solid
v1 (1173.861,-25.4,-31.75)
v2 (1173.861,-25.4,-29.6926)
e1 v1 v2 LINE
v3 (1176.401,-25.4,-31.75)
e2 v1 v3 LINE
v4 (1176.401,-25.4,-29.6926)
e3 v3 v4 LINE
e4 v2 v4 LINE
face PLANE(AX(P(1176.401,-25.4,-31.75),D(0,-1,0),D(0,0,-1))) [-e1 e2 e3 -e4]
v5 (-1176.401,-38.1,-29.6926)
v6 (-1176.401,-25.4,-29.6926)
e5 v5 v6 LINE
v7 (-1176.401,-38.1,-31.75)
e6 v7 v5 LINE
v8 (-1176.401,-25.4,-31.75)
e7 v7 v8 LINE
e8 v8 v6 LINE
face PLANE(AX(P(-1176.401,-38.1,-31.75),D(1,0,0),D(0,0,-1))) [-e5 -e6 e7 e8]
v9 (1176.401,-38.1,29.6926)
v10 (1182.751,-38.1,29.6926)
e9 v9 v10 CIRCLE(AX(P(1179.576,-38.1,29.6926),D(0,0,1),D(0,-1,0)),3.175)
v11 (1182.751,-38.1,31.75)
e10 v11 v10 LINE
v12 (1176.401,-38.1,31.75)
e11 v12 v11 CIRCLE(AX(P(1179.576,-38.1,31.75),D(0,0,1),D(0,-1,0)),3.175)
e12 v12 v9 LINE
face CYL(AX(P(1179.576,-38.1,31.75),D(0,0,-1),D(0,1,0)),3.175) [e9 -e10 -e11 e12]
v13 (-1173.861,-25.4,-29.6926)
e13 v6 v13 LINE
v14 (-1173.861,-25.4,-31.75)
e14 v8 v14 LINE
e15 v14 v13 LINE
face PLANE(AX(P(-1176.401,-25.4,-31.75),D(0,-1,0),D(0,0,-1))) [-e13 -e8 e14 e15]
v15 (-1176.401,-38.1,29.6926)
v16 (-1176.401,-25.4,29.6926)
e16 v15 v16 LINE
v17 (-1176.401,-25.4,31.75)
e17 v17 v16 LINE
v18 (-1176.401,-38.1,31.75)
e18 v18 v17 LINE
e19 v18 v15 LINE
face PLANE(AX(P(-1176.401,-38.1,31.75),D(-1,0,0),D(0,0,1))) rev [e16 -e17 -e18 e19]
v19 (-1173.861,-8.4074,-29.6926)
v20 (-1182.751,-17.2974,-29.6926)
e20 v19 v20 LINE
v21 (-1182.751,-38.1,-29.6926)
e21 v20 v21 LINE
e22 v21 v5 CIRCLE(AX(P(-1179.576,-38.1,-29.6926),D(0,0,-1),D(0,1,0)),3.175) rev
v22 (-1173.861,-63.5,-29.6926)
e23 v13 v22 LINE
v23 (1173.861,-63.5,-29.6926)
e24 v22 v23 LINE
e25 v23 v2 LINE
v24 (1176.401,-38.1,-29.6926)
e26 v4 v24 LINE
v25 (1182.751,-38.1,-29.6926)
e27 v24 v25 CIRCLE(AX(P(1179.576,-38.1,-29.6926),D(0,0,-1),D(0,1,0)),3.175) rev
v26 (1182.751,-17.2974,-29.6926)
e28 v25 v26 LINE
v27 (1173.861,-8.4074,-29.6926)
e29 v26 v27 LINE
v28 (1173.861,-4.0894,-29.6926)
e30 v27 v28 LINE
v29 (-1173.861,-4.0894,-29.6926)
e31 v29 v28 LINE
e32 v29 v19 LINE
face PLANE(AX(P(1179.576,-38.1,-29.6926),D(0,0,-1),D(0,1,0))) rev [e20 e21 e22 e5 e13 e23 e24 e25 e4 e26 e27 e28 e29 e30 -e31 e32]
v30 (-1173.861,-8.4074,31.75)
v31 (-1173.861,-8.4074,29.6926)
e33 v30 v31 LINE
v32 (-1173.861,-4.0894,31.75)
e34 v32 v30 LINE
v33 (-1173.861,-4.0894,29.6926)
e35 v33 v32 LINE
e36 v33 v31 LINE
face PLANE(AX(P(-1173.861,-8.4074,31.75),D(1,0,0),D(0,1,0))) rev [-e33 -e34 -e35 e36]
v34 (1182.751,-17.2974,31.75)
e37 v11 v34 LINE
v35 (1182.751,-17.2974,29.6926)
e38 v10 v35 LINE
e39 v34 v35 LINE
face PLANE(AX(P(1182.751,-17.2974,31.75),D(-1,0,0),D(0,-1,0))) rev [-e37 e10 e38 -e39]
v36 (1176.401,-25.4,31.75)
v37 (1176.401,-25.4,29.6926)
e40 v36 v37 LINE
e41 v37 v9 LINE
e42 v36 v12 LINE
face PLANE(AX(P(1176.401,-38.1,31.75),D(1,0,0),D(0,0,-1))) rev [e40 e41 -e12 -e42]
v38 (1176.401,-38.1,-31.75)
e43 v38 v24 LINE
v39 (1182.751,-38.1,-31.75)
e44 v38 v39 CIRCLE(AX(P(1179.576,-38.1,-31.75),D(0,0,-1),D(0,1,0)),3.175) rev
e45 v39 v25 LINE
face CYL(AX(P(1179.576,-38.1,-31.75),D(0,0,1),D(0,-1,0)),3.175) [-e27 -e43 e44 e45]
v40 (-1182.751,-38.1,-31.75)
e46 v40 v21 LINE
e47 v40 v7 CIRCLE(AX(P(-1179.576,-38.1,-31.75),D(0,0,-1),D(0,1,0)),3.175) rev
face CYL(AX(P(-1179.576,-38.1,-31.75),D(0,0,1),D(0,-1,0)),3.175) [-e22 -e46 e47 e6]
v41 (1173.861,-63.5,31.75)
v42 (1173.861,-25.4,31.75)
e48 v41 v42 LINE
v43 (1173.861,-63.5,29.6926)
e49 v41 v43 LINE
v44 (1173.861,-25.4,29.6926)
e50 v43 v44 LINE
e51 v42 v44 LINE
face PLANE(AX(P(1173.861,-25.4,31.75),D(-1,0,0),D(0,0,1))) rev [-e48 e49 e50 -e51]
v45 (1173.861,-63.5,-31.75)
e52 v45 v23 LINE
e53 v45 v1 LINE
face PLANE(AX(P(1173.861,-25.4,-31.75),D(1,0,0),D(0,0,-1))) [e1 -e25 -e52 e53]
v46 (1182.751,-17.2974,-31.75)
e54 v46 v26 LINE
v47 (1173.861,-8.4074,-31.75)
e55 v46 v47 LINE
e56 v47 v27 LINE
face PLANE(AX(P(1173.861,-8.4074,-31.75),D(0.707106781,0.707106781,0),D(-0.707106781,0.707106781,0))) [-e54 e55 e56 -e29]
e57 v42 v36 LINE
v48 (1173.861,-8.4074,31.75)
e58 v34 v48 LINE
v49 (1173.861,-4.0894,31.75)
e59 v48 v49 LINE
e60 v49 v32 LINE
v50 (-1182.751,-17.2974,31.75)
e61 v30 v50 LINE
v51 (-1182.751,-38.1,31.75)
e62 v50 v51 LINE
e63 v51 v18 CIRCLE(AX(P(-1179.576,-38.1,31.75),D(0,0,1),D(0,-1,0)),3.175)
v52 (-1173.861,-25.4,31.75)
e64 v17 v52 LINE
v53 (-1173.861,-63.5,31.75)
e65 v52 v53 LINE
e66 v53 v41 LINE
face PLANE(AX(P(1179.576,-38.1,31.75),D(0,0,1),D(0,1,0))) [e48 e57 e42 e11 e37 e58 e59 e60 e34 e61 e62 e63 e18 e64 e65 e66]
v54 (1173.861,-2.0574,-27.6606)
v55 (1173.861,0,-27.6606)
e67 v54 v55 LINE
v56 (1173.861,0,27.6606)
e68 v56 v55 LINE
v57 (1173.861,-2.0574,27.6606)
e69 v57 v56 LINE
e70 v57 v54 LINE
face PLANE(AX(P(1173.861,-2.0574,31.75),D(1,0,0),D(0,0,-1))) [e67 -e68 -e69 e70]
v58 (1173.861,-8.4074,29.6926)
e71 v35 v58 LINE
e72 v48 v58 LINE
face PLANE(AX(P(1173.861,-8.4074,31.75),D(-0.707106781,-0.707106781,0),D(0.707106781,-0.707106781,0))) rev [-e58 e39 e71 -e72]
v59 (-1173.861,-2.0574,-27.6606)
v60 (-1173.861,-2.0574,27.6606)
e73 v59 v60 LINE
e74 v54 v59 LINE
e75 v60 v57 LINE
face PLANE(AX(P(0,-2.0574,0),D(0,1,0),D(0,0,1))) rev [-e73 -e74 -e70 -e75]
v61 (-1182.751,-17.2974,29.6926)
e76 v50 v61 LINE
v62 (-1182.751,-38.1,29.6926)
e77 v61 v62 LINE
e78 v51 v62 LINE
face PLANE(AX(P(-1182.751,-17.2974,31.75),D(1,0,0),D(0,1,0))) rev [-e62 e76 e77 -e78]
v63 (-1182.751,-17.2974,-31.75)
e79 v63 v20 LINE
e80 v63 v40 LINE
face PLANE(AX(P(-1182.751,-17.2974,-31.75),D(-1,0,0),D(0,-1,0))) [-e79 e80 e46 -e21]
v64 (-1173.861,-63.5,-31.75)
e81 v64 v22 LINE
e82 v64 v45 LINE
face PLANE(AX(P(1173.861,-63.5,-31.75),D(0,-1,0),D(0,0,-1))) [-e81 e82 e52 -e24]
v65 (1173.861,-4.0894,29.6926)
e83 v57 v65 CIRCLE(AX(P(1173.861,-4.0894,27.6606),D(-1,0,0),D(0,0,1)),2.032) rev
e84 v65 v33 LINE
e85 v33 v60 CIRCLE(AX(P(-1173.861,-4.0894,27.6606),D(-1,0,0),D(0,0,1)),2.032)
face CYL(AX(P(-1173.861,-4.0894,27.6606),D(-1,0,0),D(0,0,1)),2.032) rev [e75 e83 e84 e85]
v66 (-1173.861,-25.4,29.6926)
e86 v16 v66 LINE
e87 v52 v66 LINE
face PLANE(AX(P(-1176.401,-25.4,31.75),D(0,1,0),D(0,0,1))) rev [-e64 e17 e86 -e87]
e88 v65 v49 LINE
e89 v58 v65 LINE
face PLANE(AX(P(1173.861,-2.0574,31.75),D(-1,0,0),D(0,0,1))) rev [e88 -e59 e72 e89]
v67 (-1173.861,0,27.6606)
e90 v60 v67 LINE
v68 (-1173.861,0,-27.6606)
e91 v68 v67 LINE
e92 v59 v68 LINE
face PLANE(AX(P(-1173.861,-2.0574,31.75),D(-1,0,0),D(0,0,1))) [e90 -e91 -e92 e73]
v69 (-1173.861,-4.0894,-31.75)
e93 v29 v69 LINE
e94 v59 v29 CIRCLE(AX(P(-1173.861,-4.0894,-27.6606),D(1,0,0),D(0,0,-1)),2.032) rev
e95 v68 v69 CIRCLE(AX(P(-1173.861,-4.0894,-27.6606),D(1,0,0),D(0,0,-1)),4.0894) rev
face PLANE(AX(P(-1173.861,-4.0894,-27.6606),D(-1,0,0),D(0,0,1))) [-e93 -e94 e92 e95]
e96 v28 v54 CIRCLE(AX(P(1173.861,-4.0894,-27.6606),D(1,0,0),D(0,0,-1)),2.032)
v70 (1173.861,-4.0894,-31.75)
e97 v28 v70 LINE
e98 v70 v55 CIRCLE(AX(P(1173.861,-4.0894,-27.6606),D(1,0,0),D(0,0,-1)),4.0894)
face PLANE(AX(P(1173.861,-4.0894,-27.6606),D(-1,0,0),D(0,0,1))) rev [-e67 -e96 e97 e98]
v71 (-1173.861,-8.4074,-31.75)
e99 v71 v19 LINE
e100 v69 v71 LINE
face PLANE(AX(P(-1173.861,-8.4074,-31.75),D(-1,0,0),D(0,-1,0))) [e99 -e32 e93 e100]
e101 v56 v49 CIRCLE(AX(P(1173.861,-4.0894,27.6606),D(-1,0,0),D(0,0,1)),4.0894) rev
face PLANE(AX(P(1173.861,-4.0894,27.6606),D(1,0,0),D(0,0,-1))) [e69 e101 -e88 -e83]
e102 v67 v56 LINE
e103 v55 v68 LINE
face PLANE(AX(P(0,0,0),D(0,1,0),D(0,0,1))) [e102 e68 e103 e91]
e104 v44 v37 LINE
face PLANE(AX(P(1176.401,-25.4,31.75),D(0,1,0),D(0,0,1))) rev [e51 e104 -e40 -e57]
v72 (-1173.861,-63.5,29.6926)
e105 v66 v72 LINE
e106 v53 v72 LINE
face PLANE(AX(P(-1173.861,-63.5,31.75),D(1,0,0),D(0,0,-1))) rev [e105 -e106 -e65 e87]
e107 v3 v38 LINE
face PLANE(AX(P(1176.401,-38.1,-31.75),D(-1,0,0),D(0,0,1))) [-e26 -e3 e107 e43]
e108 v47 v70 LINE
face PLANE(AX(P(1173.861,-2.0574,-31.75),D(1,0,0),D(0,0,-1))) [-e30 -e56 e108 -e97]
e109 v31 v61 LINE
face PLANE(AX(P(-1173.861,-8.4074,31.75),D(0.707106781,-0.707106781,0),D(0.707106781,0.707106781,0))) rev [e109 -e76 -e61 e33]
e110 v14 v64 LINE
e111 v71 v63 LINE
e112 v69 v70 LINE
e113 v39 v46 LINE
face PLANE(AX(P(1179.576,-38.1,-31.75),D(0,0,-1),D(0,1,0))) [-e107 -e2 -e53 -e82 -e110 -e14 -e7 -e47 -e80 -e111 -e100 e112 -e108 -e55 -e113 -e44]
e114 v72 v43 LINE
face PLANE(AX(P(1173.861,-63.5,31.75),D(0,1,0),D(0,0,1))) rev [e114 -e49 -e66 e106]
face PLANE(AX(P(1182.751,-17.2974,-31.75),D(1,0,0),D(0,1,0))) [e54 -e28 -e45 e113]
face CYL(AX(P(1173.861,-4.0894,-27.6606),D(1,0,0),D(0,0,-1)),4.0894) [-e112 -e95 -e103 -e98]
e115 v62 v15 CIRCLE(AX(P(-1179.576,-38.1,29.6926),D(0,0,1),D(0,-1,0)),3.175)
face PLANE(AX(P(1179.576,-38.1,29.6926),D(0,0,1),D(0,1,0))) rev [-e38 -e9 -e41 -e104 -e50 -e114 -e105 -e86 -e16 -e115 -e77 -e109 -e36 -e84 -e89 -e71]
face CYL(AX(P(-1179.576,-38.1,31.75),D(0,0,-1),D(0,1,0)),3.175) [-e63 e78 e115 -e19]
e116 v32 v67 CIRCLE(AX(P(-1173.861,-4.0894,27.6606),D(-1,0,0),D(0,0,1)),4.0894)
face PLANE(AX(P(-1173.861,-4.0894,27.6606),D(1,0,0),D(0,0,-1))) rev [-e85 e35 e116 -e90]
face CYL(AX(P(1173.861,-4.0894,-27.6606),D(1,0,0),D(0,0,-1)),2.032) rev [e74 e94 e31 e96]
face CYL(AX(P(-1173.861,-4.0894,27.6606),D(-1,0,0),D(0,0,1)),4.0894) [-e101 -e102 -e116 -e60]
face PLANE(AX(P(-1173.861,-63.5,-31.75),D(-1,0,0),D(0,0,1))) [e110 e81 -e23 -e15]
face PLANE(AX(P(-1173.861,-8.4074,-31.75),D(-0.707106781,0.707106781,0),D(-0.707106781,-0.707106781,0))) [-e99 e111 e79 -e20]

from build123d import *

# Parameters (mm, degrees)
SKETCH2_W                    = 2347.722
SKETCH2_H                    = 63.5
BASE_FLANGE1_DEPTH           = 2.0574
EDGE_FLANGE1_STRIP_W         = 12.2936
EDGE_FLANGE1_STRIP_H         = 2.0574
EDGE_FLANGE1_STRIP_CUT_DEPTH = 2347.722
EDGE_FLANGE1_DEPTH           = 2347.722
EDGE_FLANGE1_FLAT_DEPTH      = 2.0574


# Sheet-metal steps are written as plain solids
with BuildPart() as part:
    # Sketch2 → Base-Flange1 (new body)
    with BuildSketch(Plane(origin=(0, 0, 0), x_dir=(1, 0, 0), z_dir=(0, 1, 0))):
        Rectangle(SKETCH2_W, SKETCH2_H)
    extrude(amount=-BASE_FLANGE1_DEPTH)

    # Edge-Flange1 strip (across the edge) → Edge-Flange1 strip cut (cut)
    with BuildSketch(Plane(origin=(-1173.861, -2.0574, -31.75), x_dir=(0, 0, 1), z_dir=(1, 0, 0))):
        with Locations((-2.0574, -1.0287)):
            Rectangle(EDGE_FLANGE1_STRIP_W, EDGE_FLANGE1_STRIP_H)
    edge_flange1_strip_cut = extrude(amount=EDGE_FLANGE1_STRIP_CUT_DEPTH, mode=Mode.SUBTRACT)

    # Edge-Flange1 bend section (across the edge) → Edge-Flange1 (add)
    with BuildSketch(Plane(origin=(-1173.861, -2.0574, -31.75), x_dir=(0, 0, 1), z_dir=(1, 0, 0))):
        with BuildLine():
            Line((0, 2.032), (2.0574, 2.032))
            ThreePointArc((2.0574, 2.032), (2.652559021, 0.595159021), (4.0894, 0))
            Line((4.0894, 0), (4.0894, -2.0574))
            ThreePointArc((4.0894, -2.0574), (1.197757529, -0.859642471), (0, 2.032))
        make_face()
    edge_flange1 = extrude(amount=EDGE_FLANGE1_DEPTH)

    # Edge-Flange1 profile (on flange) → Edge-Flange1 flat (add)
    with BuildSketch(Plane(origin=(0, -2.0574, -31.75), x_dir=(-1, 0, 0), z_dir=(0, 0, 1))):
        with BuildLine():
            Line((1176.401, 36.0426), (1176.401, 23.3426))
            Line((1176.401, 23.3426), (1173.861, 23.3426))
            Line((1173.861, 23.3426), (1173.861, 61.4426))
            Line((1173.861, 61.4426), (-1173.861, 61.4426))
            Line((-1173.861, 61.4426), (-1173.861, 23.3426))
            Line((-1173.861, 23.3426), (-1176.401, 23.3426))
            Line((-1176.401, 23.3426), (-1176.401, 36.0426))
            ThreePointArc((-1176.401, 36.0426), (-1179.576, 39.2176), (-1182.751, 36.0426))
            Line((-1182.751, 36.0426), (-1182.751, 15.24))
            Line((-1182.751, 15.24), (-1173.861, 6.35))
            Line((-1173.861, 6.35), (-1173.861, 2.032))
            Line((-1173.861, 2.032), (1173.861, 2.032))
            Line((1173.861, 2.032), (1173.861, 6.35))
            Line((1173.861, 6.35), (1182.751, 15.24))
            Line((1182.751, 15.24), (1182.751, 36.0426))
            ThreePointArc((1182.751, 36.0426), (1179.576, 39.2176), (1176.401, 36.0426))
        make_face()
    edge_flange1_flat = extrude(amount=EDGE_FLANGE1_FLAT_DEPTH)

    # Mirror1: Edge-Flange1 strip cut, Edge-Flange1, Edge-Flange1 flat across plane
    add(edge_flange1_strip_cut.mirror(Plane.XY), mode=Mode.SUBTRACT)
    add(edge_flange1.mirror(Plane.XY))
    add(edge_flange1_flat.mirror(Plane.XY))


solid = part.part
